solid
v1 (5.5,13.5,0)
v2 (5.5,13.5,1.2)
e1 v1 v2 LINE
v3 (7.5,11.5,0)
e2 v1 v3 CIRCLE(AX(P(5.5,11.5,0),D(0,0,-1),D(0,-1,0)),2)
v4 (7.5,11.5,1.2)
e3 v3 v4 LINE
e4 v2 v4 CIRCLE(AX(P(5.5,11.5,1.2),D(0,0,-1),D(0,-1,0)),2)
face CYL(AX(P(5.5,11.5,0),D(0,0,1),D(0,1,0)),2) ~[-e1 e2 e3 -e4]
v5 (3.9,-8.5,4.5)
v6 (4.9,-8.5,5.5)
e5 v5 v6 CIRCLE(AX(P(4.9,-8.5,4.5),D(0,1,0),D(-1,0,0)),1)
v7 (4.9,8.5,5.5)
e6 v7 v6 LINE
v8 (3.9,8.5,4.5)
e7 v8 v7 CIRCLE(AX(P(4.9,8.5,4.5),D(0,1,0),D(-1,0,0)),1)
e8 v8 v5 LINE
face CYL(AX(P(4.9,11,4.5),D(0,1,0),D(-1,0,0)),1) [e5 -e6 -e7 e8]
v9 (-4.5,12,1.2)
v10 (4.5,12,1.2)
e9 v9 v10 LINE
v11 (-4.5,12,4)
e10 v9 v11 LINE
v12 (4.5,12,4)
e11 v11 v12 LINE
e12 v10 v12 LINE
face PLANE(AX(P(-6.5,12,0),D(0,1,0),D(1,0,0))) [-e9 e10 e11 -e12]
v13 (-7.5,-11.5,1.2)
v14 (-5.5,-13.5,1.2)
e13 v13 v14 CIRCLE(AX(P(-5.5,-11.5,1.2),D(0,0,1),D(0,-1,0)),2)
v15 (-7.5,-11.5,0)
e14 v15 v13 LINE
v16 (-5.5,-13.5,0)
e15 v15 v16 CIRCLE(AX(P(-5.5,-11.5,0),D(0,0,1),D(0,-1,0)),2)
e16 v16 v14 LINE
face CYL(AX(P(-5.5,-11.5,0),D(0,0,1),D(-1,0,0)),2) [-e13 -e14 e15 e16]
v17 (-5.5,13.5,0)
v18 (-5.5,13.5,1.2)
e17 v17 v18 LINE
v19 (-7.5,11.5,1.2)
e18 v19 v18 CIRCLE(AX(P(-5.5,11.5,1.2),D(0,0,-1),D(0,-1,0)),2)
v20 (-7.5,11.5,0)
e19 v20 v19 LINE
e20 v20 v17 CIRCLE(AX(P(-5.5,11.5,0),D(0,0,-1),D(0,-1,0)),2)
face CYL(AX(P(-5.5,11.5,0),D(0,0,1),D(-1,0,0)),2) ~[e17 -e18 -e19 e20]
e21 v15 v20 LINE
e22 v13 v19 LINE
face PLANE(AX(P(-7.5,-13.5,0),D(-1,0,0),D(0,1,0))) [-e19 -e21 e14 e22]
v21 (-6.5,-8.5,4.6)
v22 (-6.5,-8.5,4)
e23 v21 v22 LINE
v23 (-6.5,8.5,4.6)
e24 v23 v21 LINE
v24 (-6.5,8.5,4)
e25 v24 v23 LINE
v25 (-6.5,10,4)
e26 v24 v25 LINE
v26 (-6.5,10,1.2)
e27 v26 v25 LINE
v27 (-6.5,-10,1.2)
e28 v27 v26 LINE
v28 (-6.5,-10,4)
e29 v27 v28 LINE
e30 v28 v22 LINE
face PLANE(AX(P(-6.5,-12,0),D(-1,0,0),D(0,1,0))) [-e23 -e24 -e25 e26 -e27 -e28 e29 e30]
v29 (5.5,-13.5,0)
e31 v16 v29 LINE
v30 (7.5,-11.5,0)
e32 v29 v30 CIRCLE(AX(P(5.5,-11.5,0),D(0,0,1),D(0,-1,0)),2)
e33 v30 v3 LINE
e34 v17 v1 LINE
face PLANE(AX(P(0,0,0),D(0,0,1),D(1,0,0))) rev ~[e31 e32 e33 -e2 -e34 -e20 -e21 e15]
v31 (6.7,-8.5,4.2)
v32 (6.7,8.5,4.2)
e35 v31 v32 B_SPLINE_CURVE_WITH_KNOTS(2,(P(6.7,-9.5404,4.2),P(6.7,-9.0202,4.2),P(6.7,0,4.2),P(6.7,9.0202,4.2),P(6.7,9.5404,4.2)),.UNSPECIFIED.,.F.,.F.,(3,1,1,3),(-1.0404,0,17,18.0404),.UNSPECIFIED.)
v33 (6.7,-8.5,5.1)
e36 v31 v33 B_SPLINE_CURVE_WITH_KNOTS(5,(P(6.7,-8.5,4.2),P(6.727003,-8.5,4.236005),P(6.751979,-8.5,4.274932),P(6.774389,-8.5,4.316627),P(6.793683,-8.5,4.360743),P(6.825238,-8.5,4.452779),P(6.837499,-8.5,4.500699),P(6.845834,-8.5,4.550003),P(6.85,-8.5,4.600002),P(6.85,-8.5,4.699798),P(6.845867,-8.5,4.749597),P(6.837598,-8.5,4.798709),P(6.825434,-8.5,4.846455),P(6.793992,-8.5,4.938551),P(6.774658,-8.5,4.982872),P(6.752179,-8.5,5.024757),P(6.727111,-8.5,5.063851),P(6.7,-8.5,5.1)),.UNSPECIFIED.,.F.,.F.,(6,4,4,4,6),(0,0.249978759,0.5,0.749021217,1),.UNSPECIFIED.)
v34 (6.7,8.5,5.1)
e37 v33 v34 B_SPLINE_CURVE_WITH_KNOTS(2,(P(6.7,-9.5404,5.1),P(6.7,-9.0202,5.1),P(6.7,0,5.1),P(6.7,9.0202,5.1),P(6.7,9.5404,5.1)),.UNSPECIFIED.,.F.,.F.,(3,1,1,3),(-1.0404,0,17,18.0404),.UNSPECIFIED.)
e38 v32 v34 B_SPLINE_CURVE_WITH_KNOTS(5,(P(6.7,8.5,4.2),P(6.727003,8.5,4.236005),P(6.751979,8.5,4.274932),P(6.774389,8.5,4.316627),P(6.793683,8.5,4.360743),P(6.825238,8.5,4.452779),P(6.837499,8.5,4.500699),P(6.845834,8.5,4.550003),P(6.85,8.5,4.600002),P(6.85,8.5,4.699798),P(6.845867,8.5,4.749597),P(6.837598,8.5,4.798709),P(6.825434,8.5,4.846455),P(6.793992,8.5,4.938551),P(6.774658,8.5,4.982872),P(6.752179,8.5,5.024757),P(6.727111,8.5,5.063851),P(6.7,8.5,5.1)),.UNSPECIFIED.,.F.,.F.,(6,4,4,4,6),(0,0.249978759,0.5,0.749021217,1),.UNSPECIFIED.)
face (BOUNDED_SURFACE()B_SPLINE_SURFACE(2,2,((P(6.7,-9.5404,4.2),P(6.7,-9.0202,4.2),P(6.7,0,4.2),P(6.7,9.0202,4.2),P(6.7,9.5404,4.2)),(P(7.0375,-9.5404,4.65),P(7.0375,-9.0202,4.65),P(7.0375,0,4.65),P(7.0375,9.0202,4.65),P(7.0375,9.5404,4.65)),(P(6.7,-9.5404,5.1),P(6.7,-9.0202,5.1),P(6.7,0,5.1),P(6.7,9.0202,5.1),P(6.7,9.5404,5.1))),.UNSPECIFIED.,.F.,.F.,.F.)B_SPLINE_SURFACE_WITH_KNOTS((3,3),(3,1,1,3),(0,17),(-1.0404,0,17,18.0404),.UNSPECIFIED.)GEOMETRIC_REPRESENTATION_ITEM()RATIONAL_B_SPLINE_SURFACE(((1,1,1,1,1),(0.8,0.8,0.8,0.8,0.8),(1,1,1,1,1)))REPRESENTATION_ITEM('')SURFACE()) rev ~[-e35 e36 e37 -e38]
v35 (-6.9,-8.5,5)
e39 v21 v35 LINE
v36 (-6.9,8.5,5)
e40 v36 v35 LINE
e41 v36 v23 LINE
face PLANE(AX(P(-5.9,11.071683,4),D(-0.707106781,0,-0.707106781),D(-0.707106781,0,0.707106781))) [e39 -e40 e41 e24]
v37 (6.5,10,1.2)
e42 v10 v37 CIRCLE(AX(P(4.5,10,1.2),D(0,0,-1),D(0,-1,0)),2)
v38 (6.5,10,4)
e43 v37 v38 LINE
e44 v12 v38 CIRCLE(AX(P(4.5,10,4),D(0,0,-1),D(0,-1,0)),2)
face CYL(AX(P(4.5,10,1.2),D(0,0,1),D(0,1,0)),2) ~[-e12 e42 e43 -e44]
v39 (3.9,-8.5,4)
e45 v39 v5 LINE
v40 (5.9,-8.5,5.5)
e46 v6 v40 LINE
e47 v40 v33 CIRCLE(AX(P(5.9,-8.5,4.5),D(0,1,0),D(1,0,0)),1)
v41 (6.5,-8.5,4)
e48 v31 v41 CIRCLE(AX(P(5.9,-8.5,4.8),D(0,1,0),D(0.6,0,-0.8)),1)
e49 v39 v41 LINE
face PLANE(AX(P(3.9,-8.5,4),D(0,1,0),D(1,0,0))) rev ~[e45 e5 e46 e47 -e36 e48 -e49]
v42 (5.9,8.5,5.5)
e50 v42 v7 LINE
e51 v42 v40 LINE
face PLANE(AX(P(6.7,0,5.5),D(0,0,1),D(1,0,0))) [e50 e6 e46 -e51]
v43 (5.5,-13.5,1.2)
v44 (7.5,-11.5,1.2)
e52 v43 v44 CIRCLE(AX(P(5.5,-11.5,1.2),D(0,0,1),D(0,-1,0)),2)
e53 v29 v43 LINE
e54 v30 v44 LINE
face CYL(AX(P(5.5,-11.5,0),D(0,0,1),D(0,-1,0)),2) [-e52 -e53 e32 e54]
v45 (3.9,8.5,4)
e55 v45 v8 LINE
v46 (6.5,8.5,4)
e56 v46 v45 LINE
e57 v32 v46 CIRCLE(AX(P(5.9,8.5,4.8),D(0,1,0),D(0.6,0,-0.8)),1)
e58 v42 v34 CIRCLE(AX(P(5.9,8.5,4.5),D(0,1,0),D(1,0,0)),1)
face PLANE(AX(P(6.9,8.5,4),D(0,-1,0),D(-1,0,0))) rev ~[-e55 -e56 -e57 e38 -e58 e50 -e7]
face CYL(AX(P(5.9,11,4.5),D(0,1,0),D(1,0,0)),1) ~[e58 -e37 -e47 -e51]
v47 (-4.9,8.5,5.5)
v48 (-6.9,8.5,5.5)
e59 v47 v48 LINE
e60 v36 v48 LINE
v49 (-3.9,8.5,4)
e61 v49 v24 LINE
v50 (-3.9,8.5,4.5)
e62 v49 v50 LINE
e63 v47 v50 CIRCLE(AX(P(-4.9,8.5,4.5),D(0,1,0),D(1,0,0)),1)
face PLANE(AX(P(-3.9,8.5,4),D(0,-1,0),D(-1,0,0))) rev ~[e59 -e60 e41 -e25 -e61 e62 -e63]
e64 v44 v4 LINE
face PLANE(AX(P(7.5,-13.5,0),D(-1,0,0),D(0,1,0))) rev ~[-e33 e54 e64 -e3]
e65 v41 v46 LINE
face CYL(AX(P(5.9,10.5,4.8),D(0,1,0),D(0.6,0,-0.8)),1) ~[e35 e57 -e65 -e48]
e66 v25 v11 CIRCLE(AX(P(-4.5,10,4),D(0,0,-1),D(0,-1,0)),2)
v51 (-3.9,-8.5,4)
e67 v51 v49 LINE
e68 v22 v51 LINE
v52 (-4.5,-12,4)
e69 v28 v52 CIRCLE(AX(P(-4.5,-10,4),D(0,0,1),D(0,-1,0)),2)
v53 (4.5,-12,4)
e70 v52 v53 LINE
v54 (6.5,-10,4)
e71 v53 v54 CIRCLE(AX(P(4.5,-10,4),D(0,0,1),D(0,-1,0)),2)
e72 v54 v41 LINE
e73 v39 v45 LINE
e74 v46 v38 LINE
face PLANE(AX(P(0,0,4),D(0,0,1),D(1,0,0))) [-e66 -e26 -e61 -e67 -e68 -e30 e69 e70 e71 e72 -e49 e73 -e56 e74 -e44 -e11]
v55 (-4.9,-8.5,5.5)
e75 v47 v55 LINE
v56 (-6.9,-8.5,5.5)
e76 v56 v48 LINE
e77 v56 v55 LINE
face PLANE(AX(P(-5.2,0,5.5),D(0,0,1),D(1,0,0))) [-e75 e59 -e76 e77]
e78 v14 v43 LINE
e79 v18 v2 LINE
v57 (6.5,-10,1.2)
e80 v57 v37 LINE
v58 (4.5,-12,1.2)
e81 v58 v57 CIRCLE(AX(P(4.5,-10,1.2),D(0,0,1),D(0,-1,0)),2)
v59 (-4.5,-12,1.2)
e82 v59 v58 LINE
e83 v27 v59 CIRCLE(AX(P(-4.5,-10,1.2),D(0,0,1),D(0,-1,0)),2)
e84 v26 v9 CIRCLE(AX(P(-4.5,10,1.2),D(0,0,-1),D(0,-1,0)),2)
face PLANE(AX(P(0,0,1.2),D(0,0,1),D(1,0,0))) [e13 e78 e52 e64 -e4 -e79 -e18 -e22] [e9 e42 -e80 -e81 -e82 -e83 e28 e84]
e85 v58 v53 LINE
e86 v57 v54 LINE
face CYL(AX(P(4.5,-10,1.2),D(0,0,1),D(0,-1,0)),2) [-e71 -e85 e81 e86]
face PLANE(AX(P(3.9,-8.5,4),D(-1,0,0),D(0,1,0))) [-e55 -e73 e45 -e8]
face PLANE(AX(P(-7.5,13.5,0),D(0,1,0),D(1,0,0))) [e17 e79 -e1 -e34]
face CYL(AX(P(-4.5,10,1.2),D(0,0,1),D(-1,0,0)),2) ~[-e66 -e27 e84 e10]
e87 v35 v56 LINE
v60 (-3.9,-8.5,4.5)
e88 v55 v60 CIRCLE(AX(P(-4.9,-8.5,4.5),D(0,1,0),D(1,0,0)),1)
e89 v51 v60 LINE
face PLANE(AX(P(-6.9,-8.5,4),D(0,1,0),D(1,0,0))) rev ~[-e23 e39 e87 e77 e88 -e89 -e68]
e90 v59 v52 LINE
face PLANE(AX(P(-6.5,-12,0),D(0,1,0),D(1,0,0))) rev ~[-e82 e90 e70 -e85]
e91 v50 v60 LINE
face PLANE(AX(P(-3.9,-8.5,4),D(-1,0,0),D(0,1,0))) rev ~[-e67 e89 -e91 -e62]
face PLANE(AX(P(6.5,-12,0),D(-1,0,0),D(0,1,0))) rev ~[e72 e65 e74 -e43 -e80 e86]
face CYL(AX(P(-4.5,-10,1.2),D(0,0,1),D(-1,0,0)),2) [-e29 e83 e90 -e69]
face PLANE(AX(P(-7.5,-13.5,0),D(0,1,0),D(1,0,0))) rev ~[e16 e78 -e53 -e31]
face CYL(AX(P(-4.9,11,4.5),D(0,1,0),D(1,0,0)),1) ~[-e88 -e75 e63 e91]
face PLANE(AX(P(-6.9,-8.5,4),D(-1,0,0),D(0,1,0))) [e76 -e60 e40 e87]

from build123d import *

# Parameters (mm, degrees)
F0_W        = 15
F0_H        = 27
F0_W_2      = 13
F0_H_2      = 24
F1_DEPTH    = 1.2
F2_DEPTH    = 4
F3_R        = 2
F4_W        = 2.6
F4_H        = 17
F4_W_2      = 0.4
F5_DEPTH    = 1.5
F6_T1_DEPTH = 21
F6_T3_DEPTH = 22
F7_T4_DEPTH = 22.1433659759
F8_R        = 0.75


# Not quite as in the source:
# - a fillet or chamfer that OpenCascade refuses, or shapes differently, is made with other operations: its cross-section is extruded or revolved along the edge and cut away or added


with BuildPart() as f1:
    # F0 (on Top) → F1 (new body)
    with BuildSketch(Plane.XY):
        Rectangle(F0_W, F0_H)
        Rectangle(F0_W_2, F0_H_2, mode=Mode.SUBTRACT)
    extrude(amount=F1_DEPTH)

    # F0 (on Top) → F2 (join)
    with BuildSketch(Plane.XY):
        Rectangle(F0_W_2, F0_H_2)
    extrude(amount=F2_DEPTH)

    # F3
    f3_edges = [f1.edges().sort_by_distance(p)[0] for p in [
        (6.5, 12, 2.6),
        (7.5, 13.5, 0.6),
        (-6.5, 12, 2.6),
        (-7.5, 13.5, 0.6),
        (-6.5, -12, 2.6),
        (-7.5, -13.5, 0.6),
        (7.5, -13.5, 0.6),
        (6.5, -12, 2.6),
    ]]
    fillet(f3_edges, radius=F3_R)

    # F4 (on face) → F5 (join)
    with BuildSketch(Plane.XY.offset(4)):
        with Locations((-5.2, 0)):
            Rectangle(F4_W, F4_H)
        with Locations((6.7, 0)):
            Rectangle(F4_W_2, F4_H)
        with Locations((5.2, 0)):
            Rectangle(F4_W, F4_H)
        with Locations((-6.7, 0)):
            Rectangle(F4_W_2, F4_H)
    extrude(amount=F5_DEPTH)

    # F6: fillet of radius 1 on 4 edges, made by hand

    # F6_s2 → F6_t1 (cut)
    with BuildSketch(Plane.XZ.offset(-10.5)):
        with BuildLine():
            ThreePointArc((6.5, 4), (6.794427191, 4.3527864045), (6.9, 4.8))
            Line((6.9, 4.8), (6.9, 4))
            Line((6.9, 4), (6.5, 4))
        make_face()
    extrude(amount=F6_T1_DEPTH, mode=Mode.SUBTRACT)

    # F6_s4 → F6_t3 (cut)
    with BuildSketch(Plane.XZ.offset(-11)):
        with BuildLine():
            ThreePointArc((6.9, 4.5), (6.6071067812, 5.2071067812), (5.9, 5.5))
            Line((5.9, 5.5), (6.9, 5.5))
            Line((6.9, 5.5), (6.9, 4.5))
        make_face()
        with BuildLine():
            ThreePointArc((-3.9, 4.5), (-4.1928932188, 5.2071067812), (-4.9, 5.5))
            Line((-4.9, 5.5), (-3.9, 5.5))
            Line((-3.9, 5.5), (-3.9, 4.5))
        make_face()
        with BuildLine():
            ThreePointArc((3.9, 4.5), (4.1928932188, 5.2071067812), (4.9, 5.5))
            Line((4.9, 5.5), (3.9, 5.5))
            Line((3.9, 5.5), (3.9, 4.5))
        make_face()
    extrude(amount=F6_T3_DEPTH, mode=Mode.SUBTRACT)

    # F7: chamfer of 1 on 1 edges, made by hand


with BuildPart() as f7_tool2:
    # F7_s3 → F7_t4 (new body)
    with BuildSketch(Plane.XZ.offset(-11.071682988)):
        Polygon((-5.9, 4), (-6.9, 5), (-6.9, 4), align=None)
    extrude(amount=F7_T4_DEPTH)

    split(bisect_by=Plane.YZ.offset(-6.5), keep=Keep.BOTTOM)


with BuildPart() as f1_1:
    add(f1.part)

    # F7_t1: cut F7_tool2
    add(f7_tool2.part, mode=Mode.SUBTRACT)

    # F8
    f8_edges = [f1_1.edges().sort_by_distance(p)[0] for p in [
        (6.888686, 0, 4.65),
    ]]
    fillet(f8_edges, radius=F8_R)


solid = f1_1.part
